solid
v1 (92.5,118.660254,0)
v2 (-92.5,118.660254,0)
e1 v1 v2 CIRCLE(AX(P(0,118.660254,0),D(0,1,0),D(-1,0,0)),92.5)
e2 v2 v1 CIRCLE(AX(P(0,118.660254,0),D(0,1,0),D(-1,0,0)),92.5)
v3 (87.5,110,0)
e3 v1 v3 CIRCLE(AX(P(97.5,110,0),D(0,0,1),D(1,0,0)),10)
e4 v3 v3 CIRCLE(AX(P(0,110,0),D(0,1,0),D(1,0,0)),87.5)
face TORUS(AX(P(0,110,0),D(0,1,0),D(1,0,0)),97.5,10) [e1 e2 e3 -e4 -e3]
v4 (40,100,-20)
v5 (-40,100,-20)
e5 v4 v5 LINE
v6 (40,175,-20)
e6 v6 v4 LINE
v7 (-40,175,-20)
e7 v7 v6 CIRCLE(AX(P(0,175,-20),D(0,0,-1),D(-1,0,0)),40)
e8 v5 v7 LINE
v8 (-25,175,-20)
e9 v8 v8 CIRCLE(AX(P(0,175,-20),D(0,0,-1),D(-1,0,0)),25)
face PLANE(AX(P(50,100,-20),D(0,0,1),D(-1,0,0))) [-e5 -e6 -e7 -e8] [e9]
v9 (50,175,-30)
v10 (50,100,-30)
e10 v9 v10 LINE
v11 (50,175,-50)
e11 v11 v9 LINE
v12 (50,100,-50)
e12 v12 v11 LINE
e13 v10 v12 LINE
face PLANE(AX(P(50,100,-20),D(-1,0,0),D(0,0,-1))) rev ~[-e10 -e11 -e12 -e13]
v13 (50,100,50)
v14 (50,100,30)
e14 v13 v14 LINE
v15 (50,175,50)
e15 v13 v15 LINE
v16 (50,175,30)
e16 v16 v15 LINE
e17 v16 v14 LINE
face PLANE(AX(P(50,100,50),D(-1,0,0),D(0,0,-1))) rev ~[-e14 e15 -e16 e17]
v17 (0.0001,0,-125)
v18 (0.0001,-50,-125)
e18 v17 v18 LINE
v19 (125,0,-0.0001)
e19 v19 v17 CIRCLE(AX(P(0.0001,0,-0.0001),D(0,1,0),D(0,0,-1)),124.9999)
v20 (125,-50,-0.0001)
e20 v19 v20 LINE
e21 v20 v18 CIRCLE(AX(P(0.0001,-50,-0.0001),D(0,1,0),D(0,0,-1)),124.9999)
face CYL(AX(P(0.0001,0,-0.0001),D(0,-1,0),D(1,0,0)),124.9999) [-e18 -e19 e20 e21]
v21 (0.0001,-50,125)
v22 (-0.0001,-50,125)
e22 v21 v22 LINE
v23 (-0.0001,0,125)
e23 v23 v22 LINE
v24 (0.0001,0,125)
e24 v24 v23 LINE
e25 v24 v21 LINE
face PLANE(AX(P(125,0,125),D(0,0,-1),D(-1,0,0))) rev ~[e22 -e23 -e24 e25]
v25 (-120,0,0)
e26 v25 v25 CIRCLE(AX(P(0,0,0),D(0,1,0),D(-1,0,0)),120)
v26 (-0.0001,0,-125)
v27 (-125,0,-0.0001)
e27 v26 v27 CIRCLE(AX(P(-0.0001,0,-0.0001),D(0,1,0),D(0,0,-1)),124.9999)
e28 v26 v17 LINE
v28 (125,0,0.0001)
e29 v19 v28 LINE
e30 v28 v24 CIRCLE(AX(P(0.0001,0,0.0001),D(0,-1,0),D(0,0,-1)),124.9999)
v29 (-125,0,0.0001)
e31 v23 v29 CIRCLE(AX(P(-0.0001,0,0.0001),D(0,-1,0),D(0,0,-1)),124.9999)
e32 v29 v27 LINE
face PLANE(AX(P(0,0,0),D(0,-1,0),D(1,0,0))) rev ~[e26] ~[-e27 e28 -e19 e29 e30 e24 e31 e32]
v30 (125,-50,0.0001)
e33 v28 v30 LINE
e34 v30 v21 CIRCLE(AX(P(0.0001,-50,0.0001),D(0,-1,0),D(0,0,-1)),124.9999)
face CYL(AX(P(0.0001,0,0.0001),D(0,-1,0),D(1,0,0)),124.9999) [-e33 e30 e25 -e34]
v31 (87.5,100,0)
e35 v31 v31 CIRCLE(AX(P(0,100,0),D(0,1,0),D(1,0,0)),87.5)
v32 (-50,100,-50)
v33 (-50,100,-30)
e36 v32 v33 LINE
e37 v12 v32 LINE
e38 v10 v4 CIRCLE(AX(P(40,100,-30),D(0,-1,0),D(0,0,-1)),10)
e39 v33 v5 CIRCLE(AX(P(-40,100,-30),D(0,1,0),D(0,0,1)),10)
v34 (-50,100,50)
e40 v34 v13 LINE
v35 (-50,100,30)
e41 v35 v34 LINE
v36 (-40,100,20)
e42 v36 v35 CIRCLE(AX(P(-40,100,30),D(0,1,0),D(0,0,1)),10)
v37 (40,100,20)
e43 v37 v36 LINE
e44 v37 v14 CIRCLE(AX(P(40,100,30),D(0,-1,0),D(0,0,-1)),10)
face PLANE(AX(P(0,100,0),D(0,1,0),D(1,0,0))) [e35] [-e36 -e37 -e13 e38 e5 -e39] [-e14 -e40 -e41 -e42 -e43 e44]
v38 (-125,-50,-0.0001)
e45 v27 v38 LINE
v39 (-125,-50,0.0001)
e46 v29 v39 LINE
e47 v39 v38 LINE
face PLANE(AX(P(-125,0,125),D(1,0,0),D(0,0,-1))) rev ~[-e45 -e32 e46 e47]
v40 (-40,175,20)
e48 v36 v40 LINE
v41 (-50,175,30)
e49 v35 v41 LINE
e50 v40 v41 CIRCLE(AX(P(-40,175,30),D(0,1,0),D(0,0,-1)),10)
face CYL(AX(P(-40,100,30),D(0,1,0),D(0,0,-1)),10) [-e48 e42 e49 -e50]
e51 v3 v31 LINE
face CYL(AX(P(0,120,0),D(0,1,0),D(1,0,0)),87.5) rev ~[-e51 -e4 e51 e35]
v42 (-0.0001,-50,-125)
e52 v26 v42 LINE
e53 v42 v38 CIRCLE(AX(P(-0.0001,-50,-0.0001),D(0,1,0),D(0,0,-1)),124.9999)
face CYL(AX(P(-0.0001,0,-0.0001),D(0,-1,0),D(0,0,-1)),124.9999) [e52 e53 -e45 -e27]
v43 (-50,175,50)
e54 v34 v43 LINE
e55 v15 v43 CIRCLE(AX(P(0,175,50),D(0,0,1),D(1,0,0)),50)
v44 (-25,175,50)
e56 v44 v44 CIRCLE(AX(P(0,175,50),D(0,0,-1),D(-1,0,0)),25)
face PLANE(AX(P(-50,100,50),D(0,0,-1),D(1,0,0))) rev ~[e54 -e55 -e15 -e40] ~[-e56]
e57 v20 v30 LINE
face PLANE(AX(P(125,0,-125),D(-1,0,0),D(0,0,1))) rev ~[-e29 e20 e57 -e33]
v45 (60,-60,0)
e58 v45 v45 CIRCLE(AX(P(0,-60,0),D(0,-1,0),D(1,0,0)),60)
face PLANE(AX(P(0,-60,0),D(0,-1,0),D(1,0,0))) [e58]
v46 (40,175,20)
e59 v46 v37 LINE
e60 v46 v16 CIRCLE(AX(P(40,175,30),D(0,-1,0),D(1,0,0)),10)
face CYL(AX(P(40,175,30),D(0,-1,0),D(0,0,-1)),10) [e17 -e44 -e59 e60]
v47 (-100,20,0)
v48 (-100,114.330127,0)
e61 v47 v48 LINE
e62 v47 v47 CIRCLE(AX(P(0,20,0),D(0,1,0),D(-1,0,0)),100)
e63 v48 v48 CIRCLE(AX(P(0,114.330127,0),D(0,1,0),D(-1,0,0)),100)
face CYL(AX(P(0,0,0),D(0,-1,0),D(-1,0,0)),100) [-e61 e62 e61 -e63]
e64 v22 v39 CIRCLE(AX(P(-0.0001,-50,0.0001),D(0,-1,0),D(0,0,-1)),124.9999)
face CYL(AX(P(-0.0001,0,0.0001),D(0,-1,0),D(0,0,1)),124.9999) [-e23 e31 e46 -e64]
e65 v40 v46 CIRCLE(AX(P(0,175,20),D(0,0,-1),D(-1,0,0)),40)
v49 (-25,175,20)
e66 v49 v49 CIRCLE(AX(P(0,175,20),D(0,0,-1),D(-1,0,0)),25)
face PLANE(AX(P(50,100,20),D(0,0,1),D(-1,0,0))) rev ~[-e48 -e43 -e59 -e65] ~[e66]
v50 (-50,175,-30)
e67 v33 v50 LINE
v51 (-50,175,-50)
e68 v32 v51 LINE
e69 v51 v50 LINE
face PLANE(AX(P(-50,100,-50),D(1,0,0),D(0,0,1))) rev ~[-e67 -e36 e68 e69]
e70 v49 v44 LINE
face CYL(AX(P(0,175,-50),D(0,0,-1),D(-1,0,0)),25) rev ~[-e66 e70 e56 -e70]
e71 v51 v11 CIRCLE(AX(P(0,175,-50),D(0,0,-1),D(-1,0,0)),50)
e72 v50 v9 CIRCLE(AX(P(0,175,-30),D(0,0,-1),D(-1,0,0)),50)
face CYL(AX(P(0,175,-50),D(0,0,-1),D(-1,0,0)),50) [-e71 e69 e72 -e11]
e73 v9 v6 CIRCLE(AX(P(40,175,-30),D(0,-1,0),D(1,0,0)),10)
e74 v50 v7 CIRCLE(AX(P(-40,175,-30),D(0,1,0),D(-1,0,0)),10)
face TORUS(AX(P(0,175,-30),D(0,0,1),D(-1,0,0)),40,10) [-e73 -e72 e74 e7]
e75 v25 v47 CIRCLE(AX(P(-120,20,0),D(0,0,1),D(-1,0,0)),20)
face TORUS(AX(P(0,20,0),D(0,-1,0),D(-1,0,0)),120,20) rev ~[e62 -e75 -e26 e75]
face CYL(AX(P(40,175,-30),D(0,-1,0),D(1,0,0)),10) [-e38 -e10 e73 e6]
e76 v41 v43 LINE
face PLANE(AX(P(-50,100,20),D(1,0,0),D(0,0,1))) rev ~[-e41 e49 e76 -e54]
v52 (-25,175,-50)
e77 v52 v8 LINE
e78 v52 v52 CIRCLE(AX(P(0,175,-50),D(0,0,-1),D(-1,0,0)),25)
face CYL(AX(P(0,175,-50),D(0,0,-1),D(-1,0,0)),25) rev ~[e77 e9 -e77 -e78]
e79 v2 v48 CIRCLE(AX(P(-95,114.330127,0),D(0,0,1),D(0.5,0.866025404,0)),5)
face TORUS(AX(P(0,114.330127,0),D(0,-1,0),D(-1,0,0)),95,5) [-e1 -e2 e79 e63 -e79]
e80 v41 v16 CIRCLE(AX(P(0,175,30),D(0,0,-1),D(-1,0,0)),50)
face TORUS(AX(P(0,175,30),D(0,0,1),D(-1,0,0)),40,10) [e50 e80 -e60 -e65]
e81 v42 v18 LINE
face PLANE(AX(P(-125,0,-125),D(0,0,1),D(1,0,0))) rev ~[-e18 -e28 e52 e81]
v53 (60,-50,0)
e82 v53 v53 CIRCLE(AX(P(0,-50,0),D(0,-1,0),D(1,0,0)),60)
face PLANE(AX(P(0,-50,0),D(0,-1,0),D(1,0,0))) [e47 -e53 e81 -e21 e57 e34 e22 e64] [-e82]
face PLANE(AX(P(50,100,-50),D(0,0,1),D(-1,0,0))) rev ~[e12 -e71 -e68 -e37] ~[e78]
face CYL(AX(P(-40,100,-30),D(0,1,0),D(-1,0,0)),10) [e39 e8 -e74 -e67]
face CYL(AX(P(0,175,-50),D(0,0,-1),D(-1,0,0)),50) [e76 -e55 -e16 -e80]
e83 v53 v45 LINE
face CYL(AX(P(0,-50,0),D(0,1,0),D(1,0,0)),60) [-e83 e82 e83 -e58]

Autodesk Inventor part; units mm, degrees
ref_plane "YZ Plane" through (0, 0, 0) normal (1, 0, 0) x (0, 1, 0)
ref_plane "XZ Plane" through (0, 0, 0) normal (0, 1, 0) x (-1, 0, 0)
ref_plane "XY Plane" through (0, 0, 0) normal (0, 0, 1) x (1, 0, 0)
sketch "Sketch1" plane through (0, 0, 0) normal (0, 1, 0) x (-1, 0, 0)
  circle A0 centre (0, 0) radius 100
  dimension "d0" = 200
extrude "Extrusion1" add sketch "Sketch1" along normal blind 120
sketch "Sketch2" plane through (0, 0, 0) normal (0, -1, 0) x (1, 0, 0)
  line L0 (125, 125) -> (-125, 125)
  line L1 (-125, 125) -> (-125, -125)
  line L2 (-125, -125) -> (125, -125)
  line L3 (125, -125) -> (125, 125)
  line L4 (125, 125) -> (-125, -125) construction
  line L5 (-125, 125) -> (125, -125) construction
  point P0 (0, 0)
  dimension "d3" = 250
  dimension "d4" = 250
extrude "Extrusion2" add sketch "Sketch2" along normal blind 50
fillet "Fillet1" radius 20 1 edges at (100, 0, 0)
sketch "Sketch3" plane through (0, 120, 0) normal (0, 1, 0) x (1, 0, 0)
  circle A0 centre (0, 0) radius 87.5
  dimension "d8" = 175
extrude "Extrusion3" cut sketch "Sketch3" against normal blind 20
fillet "Fillet2" radius 10 1 edges at (-87.5, 120, 0)
sketch "Sketch4" plane through (0, 100, 0) normal (0, 1, 0) x (1, 0, 0)
  line L0 (-50, -50) -> (50, -50)
  line L1 (50, -50) -> (50, 50)
  line L2 (50, 50) -> (-50, 50)
  line L3 (-50, 50) -> (-50, -50)
  line L4 (-50, -50) -> (50, 50) construction
  line L5 (50, -50) -> (-50, 50) construction
  line L6 (-50, -50) -> (50, -50)
  line L7 (50, -50) -> (50, -20)
  line L8 (50, -20) -> (-50, -20)
  line L9 (-50, -20) -> (-50, -50)
  line L10 (-50, 50) -> (50, 50)
  line L11 (50, 50) -> (50, 20)
  line L12 (50, 20) -> (-50, 20)
  line L13 (-50, 20) -> (-50, 50)
  point P0 (0, 0)
  dimension "d12" = 100
  dimension "d13" = 100
  dimension "d14" = 30
  dimension "d15" = 30
extrude "Extrusion4" add sketch "Sketch4" along normal blind 125 contours L3 L8 L1 L0 | L3 L2 L1 L12
sketch "Sketch5" plane through (50, 100, -50) normal (0, 0, -1) x (-1, 0, 0)
  circle A0 centre (50, 75) radius 50
  line L0 (0, 0) -> (0, 125) projected
  line L1 (0, 75) -> (0, 125)
  line L2 (0, 125) -> (100, 125)
  line L3 (100, 125) -> (100, 75)
  circle A1 centre (50, 75) radius 25
  point P0 (50, -100)
  point P1 (50, 125)
  dimension "d18" = 50
extrude "Extrusion5" cut sketch "Sketch5" against normal blind 125 contours L0 L2 A0 | A0 L2 L3 | A1
fillet "Fillet3" radius 10 3 edges at (-50, 137.5, -20) (0, 225, -20) (50, 137.5, -20)
fillet "Fillet4" radius 10 3 edges at (0, 225, 20) (50, 137.5, 20) (-50, 137.5, 20)
fillet "Fillet5" radius 5 1 edges at (100, 120, 0)
fillet "Fillet6" radius 125 4 edges at (125, -25, 125) (125, -25, -125) (-125, -25, 125) (-125, -25, -125)
sketch "Sketch6" plane through (0, -50, 0) normal (0, -1, 0) x (1, 0, 0)
  circle A0 centre (0, 0) radius 60
  dimension "d25" = 120
extrude "Extrusion6" add sketch "Sketch6" along normal blind 10
properties part number "HANDBASE1"
